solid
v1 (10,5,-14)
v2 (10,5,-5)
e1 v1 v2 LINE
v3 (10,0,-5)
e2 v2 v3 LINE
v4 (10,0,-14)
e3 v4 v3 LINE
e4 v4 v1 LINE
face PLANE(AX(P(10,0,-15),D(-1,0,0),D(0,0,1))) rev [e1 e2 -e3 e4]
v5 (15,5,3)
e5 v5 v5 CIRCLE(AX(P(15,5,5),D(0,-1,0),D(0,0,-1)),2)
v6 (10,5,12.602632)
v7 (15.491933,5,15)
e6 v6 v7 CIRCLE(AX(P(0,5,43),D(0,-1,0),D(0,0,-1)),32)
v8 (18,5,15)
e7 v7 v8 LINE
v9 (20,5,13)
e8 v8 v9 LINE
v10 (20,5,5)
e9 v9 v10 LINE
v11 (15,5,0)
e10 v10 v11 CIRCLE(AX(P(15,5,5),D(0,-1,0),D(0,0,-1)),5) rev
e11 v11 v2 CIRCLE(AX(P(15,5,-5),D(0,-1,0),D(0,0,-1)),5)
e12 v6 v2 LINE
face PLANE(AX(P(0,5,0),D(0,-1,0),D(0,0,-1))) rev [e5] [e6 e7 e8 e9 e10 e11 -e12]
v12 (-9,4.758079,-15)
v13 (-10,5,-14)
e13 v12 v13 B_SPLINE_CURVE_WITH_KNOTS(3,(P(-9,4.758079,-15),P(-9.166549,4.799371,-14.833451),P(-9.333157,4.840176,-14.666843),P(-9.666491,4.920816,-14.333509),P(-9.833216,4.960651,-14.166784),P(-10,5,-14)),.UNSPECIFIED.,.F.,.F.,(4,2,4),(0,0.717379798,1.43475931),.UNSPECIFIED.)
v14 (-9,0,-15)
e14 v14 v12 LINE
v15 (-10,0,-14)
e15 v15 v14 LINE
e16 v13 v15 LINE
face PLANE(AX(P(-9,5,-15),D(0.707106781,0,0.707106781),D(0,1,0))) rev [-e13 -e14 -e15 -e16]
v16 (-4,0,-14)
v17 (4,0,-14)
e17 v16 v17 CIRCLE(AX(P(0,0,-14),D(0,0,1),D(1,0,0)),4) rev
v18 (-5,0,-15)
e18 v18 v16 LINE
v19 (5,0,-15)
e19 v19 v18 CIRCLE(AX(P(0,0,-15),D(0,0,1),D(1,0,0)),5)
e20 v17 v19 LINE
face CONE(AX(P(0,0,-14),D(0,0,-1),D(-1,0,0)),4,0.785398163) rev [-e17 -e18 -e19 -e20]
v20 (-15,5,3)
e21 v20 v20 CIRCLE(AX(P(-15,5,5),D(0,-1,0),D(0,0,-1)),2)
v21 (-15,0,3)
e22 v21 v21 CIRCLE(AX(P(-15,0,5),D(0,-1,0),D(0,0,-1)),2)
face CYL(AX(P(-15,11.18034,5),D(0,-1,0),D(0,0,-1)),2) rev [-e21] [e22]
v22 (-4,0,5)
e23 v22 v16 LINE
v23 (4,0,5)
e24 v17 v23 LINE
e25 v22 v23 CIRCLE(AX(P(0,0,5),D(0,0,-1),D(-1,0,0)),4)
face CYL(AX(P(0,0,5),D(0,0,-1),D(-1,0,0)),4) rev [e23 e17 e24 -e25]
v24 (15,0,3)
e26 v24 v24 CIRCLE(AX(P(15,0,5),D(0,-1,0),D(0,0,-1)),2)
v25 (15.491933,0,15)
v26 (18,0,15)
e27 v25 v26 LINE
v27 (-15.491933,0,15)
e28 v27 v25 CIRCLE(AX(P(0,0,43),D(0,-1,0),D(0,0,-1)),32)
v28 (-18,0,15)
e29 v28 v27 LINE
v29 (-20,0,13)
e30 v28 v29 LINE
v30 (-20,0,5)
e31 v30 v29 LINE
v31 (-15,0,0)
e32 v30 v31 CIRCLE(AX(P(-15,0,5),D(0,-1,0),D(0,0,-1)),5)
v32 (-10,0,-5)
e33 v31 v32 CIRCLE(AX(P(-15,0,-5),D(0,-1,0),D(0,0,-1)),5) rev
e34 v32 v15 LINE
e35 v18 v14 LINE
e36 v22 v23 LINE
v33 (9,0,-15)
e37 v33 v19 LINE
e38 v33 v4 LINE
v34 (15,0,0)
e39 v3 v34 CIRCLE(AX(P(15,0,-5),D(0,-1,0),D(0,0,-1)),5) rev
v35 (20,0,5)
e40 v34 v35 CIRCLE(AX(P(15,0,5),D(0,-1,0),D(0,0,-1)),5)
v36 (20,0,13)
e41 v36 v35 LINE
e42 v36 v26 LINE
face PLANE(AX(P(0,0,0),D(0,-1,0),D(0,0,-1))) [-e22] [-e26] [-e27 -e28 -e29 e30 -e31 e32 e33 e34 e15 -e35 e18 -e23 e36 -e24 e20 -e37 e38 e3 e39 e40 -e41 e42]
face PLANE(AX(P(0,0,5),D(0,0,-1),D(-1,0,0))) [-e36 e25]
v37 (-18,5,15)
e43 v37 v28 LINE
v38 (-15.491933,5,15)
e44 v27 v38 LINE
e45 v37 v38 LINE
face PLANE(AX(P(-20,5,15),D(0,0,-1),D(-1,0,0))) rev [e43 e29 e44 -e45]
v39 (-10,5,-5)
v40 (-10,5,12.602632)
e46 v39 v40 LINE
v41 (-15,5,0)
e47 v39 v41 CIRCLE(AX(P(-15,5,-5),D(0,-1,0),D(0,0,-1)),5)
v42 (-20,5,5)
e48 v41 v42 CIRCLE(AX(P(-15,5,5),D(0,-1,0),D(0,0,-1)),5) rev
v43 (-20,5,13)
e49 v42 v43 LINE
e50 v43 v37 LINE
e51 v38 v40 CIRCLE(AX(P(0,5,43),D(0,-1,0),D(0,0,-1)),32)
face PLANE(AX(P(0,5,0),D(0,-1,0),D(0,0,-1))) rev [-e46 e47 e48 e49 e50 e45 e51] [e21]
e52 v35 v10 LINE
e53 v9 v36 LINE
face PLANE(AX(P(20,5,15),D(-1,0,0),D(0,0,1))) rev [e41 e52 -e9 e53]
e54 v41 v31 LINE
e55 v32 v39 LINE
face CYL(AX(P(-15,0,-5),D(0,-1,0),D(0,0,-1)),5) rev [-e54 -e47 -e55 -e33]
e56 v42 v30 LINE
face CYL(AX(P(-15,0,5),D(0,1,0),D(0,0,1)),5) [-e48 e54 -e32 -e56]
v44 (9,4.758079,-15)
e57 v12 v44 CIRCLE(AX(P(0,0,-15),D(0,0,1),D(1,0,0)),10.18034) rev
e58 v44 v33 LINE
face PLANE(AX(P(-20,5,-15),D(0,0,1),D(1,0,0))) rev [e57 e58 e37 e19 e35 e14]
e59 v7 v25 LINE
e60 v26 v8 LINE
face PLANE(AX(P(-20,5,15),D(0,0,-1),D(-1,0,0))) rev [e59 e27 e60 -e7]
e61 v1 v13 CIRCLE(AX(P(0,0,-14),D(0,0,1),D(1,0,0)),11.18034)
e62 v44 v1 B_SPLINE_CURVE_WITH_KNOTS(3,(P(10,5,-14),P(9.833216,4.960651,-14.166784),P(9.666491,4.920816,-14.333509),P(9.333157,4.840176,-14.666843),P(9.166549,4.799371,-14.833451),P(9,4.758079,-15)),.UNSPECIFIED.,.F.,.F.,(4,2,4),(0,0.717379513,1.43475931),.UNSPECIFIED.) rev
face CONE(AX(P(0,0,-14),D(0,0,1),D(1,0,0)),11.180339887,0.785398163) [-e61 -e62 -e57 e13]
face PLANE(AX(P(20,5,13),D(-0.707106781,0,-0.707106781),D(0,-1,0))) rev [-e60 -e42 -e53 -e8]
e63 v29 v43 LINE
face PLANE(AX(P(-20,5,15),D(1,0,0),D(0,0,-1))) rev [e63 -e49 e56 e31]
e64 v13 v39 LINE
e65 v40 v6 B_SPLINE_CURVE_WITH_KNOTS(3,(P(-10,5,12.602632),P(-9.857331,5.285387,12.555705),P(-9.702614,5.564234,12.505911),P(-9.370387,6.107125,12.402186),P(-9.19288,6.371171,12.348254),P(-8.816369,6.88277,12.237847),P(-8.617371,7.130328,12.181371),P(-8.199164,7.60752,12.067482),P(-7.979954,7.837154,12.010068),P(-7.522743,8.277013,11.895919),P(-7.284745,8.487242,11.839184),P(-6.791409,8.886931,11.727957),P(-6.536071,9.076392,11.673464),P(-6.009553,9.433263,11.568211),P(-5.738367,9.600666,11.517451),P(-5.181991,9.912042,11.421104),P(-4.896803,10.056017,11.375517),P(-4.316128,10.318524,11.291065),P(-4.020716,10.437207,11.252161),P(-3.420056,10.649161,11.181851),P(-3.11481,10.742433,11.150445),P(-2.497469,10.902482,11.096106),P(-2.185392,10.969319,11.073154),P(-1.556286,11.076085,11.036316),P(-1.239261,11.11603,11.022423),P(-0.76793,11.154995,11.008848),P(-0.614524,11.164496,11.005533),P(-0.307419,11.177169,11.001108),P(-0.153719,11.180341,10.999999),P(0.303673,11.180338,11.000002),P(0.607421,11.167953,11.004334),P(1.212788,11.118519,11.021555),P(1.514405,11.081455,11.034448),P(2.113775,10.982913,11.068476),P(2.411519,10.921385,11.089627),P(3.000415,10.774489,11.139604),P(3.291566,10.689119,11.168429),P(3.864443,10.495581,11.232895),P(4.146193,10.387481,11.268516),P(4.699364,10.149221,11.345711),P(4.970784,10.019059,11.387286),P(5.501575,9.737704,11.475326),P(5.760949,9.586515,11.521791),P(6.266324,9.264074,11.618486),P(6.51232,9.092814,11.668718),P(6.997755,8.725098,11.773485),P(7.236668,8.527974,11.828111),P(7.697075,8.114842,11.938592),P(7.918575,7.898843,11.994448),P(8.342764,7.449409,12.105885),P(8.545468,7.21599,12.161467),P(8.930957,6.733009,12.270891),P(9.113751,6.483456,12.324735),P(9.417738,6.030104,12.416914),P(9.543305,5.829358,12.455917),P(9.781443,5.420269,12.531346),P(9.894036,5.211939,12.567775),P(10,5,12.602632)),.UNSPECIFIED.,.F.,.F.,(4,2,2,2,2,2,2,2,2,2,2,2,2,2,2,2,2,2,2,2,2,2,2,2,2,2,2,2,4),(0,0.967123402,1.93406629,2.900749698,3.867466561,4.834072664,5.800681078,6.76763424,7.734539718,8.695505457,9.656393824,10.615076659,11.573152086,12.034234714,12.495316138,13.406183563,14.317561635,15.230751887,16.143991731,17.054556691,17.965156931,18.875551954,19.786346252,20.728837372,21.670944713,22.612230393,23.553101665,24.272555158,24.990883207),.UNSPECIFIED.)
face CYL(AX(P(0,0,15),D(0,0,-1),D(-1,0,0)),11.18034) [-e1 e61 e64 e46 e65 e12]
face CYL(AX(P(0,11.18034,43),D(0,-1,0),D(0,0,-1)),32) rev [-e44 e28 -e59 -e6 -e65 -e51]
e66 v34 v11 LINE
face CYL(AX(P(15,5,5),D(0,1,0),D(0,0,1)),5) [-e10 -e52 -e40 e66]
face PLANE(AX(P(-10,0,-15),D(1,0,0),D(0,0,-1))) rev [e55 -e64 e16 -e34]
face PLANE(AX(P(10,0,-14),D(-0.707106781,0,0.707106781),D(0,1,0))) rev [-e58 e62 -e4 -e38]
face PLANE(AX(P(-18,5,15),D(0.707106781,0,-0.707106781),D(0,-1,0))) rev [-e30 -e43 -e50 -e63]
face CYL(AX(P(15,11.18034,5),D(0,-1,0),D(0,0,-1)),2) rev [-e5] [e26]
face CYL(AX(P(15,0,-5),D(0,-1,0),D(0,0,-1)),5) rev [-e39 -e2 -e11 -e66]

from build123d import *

# Parameters (mm, degrees)
SKETCH1_W           = 40
SKETCH1_H           = 30
BOSS_EXTRUDE1_DEPTH = 5
SKETCH3_W           = 20
SKETCH3_H           = 30
BOSS_EXTRUDE2_DEPTH = 7.5
CUT_EXTRUDE1_DEPTH  = 39.160843806
SKETCH5_W           = 10
SKETCH5_H           = 15
CUT_EXTRUDE2_DEPTH  = 26.752603774
SKETCH6_R           = 4
CUT_EXTRUDE3_DEPTH  = 20
CHAMFER1_SIZE       = 1
FILLET1_R           = 5
SKETCH7_R           = 2
CUT_EXTRUDE4_DEPTH  = 28.386127875
CHAMFER2_SIZE       = 2
SKETCH8_R           = 32
CUT_EXTRUDE5_DEPTH  = 28.386127875


with BuildPart() as part:
    # Sketch1 → Boss-Extrude1 (new body)
    with BuildSketch(Plane(origin=(0, 0, 0), x_dir=(1, 0, 0), z_dir=(0, 1, 0))):
        Rectangle(SKETCH1_W, SKETCH1_H)
    extrude(amount=BOSS_EXTRUDE1_DEPTH)

    # Sketch3 → Boss-Extrude2 (add)
    with BuildSketch(Plane(origin=(0, 5, 0), x_dir=(1, 0, 0), z_dir=(0, 1, 0))):
        Rectangle(SKETCH3_W, SKETCH3_H)
    extrude(amount=BOSS_EXTRUDE2_DEPTH)

    # Sketch4 → Cut-Extrude1 (cut, through all)
    with BuildSketch(Plane(origin=(0, 0, -15), x_dir=(-1, 0, 0), z_dir=(0, 0, -1))):
        with BuildLine():
            Line((-10, 5), (-10, 21.180339887))
            Line((-10, 21.180339887), (10, 21.180339887))
            Line((10, 21.180339887), (10, 5))
            ThreePointArc((10, 5), (0, 11.180339887), (-10, 5))
        make_face()
    extrude(amount=-CUT_EXTRUDE1_DEPTH, mode=Mode.SUBTRACT)

    # Sketch5 → Cut-Extrude2 (cut, through all)
    with BuildSketch(Plane(origin=(0, 5, 0), x_dir=(1, 0, 0), z_dir=(0, 1, 0))):
        with Locations((-15, 7.5)):
            Rectangle(SKETCH5_W, SKETCH5_H)
        with Locations((15, 7.5)):
            Rectangle(SKETCH5_W, SKETCH5_H)
    extrude(amount=-CUT_EXTRUDE2_DEPTH, mode=Mode.SUBTRACT)

    # Sketch6 → Cut-Extrude3 (cut)
    with BuildSketch(Plane(origin=(0, 0, -15), x_dir=(-1, 0, 0), z_dir=(0, 0, -1))):
        Circle(SKETCH6_R)
    extrude(amount=-CUT_EXTRUDE3_DEPTH, mode=Mode.SUBTRACT)

    # Chamfer1
    chamfer1_edges = [part.edges().sort_by_distance(p)[0] for p in [
        (0, 11.180339887, -15),
        (-10, 2.5, -15),
        (10, 2.5, -15),
        (0, 4, -15),
    ]]
    chamfer(chamfer1_edges, length=CHAMFER1_SIZE)

    # Fillet1
    fillet1_edges = [part.edges().sort_by_distance(p)[0] for p in [
        (10, 2.5, 0),
        (-10, 2.5, 0),
    ]]
    fillet(fillet1_edges, radius=FILLET1_R)
    fillet1_2_edges = [part.edges().sort_by_distance(p)[0] for p in [
        (20, 2.5, 0),
        (-20, 2.5, 0),
    ]]
    fillet(fillet1_2_edges, radius=FILLET1_R - 0.0001)  # a hair under: the kernel refuses the full size

    # Sketch7 → Cut-Extrude4 (cut, through all)
    with BuildSketch(Plane.XZ):
        with Locations(Location((-15, 5, 0), (0, 0, 270))):
            Circle(SKETCH7_R)
        with Locations(Location((15, 5, 0), (0, 0, 270))):
            Circle(SKETCH7_R)
    extrude(amount=-CUT_EXTRUDE4_DEPTH, mode=Mode.SUBTRACT)

    # Chamfer2
    chamfer2_edges = [part.edges().sort_by_distance(p)[0] for p in [
        (20, 2.5, 15),
        (-20, 2.5, 15),
    ]]
    chamfer(chamfer2_edges, length=CHAMFER2_SIZE)

    # Sketch8 → Cut-Extrude5 (cut, through all)
    with BuildSketch(Plane.XZ):
        with Locations((0, 43)):
            Circle(SKETCH8_R)
    extrude(amount=-CUT_EXTRUDE5_DEPTH, mode=Mode.SUBTRACT)


solid = part.part
